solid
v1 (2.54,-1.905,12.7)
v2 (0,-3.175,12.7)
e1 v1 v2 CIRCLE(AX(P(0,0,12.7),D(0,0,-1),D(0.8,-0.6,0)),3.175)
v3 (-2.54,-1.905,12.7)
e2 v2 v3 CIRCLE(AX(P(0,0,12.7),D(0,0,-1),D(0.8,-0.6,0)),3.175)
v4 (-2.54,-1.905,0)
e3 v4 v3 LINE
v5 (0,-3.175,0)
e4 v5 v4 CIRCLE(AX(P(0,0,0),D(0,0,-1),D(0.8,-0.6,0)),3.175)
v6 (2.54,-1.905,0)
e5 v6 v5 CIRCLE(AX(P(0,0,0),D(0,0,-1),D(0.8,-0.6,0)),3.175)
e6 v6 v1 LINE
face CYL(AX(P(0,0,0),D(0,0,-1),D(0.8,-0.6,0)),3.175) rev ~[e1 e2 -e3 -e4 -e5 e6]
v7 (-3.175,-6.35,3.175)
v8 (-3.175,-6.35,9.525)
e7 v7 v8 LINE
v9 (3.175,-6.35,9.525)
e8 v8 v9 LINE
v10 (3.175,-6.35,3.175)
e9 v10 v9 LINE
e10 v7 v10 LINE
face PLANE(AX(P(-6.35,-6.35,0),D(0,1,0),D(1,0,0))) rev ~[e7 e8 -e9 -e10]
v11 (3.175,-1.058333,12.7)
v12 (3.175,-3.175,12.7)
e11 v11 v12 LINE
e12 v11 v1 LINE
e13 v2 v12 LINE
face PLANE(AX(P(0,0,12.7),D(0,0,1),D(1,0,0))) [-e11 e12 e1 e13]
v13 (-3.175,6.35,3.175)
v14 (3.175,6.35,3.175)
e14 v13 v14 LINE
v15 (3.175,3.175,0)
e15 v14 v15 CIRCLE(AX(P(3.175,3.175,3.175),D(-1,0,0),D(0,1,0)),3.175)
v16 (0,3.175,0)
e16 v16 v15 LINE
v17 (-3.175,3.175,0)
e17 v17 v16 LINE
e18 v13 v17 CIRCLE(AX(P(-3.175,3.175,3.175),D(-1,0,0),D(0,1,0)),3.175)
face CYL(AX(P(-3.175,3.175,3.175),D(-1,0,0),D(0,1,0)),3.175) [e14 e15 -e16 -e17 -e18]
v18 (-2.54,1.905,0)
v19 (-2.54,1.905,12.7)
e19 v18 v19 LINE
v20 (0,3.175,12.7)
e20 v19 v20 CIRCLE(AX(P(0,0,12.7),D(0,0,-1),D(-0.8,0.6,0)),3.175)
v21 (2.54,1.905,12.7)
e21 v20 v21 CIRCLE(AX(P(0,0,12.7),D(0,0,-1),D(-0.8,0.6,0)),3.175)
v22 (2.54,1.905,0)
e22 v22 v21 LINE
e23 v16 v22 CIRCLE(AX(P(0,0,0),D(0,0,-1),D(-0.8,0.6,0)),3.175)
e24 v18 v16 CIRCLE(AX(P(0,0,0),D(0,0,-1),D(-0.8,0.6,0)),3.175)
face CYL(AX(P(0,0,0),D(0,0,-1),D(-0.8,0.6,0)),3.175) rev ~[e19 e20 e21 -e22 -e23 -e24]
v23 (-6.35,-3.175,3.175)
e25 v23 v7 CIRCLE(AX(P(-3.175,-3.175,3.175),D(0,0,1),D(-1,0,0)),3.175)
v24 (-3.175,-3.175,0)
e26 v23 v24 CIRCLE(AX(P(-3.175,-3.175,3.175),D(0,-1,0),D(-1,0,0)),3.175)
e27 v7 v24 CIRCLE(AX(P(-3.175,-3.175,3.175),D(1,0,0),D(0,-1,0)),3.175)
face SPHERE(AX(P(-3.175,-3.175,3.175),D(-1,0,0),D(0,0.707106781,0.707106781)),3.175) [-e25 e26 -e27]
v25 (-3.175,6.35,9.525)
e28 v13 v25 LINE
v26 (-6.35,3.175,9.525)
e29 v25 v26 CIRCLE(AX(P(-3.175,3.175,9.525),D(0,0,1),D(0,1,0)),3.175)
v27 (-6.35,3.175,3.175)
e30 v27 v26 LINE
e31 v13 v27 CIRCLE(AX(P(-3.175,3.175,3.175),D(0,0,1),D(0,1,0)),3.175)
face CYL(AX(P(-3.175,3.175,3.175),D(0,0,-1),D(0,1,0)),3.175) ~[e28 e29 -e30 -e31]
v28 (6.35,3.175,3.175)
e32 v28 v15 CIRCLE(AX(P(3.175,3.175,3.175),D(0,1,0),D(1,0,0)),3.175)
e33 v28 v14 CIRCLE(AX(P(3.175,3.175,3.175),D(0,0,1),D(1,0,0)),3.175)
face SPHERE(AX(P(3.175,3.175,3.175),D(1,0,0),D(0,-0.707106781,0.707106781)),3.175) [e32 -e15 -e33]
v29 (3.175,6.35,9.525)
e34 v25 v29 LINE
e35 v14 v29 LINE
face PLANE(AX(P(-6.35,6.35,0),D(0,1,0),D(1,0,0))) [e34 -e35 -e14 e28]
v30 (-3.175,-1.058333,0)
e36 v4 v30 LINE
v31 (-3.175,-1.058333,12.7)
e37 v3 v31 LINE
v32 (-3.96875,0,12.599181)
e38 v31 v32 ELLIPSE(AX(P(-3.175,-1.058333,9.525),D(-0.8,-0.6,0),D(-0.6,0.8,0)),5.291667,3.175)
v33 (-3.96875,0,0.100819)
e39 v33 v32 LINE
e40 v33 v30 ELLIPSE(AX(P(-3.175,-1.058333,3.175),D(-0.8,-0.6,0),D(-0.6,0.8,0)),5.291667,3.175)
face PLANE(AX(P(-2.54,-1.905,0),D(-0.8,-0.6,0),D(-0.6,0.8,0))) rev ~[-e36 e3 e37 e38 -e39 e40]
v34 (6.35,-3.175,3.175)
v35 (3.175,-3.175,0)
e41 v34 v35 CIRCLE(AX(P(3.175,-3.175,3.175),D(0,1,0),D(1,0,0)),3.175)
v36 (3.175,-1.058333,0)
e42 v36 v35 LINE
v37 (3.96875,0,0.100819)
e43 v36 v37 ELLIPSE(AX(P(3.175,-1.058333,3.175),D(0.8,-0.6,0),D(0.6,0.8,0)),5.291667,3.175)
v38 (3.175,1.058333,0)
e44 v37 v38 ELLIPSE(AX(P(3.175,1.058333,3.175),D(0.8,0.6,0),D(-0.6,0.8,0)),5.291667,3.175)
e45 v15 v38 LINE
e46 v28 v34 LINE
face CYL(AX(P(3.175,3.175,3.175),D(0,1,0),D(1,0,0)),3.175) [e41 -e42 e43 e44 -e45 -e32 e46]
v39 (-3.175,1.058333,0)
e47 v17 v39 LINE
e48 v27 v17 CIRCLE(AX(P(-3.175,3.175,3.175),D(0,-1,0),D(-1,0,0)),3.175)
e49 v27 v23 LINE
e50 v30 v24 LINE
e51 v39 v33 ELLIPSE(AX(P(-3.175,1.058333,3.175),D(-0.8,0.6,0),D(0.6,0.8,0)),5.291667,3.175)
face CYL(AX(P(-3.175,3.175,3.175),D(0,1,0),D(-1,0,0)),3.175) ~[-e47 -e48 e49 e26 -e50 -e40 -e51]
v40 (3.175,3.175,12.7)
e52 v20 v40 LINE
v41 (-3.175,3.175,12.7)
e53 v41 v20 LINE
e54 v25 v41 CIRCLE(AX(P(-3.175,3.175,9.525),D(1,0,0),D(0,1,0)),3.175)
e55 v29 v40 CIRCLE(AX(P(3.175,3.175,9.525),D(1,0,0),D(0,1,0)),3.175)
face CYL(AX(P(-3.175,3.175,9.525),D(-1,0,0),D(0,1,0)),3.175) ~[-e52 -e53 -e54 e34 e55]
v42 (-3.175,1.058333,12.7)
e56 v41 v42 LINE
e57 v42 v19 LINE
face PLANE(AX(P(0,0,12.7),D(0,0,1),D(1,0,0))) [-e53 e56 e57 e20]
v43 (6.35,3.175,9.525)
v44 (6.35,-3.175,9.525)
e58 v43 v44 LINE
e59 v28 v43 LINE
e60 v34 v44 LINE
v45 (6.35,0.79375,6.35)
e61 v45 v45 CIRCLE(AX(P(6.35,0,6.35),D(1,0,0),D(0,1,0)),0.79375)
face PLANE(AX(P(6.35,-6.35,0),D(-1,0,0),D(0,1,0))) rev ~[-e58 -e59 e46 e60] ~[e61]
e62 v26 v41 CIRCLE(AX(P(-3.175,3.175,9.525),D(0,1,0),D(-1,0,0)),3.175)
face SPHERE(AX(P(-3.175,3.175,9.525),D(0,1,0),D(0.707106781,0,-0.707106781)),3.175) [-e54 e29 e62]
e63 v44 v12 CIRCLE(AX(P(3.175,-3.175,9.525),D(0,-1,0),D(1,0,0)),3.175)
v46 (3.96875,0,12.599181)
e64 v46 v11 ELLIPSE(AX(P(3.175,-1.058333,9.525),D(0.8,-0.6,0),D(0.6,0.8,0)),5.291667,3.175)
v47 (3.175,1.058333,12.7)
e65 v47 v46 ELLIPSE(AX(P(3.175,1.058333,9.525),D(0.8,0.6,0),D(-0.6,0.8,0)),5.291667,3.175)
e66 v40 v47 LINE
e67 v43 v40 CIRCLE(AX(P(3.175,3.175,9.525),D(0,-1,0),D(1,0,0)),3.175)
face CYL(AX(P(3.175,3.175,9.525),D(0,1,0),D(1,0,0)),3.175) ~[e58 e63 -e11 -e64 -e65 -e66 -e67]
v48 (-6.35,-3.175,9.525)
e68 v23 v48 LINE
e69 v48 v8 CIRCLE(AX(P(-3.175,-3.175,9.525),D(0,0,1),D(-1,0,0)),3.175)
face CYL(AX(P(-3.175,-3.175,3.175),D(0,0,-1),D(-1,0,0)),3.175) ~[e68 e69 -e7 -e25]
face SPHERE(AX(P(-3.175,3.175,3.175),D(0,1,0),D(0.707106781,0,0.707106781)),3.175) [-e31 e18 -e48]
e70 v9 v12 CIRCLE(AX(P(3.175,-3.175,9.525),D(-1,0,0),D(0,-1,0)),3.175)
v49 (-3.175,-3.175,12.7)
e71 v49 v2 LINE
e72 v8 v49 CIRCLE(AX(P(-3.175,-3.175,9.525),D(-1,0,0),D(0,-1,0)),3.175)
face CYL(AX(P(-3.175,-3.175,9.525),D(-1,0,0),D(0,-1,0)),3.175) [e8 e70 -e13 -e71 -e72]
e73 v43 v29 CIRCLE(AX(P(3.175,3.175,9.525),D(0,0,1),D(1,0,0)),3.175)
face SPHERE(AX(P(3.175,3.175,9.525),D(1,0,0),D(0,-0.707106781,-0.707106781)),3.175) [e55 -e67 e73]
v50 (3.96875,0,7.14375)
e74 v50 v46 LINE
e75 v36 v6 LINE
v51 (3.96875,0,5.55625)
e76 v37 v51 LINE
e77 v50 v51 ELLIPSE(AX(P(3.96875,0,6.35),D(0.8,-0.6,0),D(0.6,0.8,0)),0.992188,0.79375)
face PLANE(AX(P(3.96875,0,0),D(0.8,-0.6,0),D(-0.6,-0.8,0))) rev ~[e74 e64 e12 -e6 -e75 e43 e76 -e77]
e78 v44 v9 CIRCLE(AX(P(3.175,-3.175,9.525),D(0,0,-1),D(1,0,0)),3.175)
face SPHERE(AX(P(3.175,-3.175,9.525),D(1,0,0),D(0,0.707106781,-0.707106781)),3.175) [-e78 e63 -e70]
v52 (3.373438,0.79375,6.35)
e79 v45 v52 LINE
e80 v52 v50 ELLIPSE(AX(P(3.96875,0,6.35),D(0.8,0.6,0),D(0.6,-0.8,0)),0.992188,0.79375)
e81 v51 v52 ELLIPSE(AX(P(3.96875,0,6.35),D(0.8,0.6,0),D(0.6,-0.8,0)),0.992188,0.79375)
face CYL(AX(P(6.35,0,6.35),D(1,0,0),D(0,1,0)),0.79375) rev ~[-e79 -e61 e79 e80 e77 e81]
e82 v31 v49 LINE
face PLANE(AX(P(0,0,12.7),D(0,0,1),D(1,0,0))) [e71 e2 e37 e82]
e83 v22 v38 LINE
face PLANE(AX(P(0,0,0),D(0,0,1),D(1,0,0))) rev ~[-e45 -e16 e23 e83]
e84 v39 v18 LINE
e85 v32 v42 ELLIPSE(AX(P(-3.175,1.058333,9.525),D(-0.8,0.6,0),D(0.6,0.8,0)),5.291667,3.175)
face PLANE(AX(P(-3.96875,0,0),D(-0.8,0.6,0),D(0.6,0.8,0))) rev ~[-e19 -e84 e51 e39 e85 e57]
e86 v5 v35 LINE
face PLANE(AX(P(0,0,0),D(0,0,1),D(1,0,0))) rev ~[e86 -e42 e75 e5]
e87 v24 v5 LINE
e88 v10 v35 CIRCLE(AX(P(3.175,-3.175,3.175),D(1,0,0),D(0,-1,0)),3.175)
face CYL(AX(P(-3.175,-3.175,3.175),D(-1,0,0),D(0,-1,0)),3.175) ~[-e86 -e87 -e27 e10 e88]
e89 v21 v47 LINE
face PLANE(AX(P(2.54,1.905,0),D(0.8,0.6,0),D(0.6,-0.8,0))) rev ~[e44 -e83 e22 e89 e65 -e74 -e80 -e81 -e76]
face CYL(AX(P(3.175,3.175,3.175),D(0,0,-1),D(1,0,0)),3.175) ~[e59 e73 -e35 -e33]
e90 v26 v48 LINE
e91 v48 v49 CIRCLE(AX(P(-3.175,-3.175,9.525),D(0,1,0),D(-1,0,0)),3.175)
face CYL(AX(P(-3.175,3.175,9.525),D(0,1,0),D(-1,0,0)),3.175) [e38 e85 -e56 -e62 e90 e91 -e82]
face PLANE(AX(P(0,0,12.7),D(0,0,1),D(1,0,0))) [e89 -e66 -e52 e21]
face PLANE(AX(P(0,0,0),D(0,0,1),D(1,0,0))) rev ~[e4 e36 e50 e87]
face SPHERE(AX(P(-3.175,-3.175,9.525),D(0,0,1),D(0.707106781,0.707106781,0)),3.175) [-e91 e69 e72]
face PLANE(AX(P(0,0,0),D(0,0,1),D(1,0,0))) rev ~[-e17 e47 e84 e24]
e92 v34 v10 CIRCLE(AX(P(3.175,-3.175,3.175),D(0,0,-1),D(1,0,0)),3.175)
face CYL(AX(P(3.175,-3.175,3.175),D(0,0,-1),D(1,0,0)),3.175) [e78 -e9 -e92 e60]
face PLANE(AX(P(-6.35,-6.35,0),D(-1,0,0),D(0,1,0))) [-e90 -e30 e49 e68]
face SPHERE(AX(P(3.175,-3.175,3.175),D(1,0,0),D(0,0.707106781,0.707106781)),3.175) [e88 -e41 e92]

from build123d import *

# Parameters (mm, degrees)
F0_W         = 12.7
F0_H         = 12.7
F1_DEPTH     = 12.7
F2_T1_DEPTH  = 6.35
F2_T3_DEPTH  = 6.35
F2_T5_DEPTH  = 6.35
F2_S9_W      = 3.175
F2_S9_H      = 3.175
F2_T10_DEPTH = 3.175
F2_S15_W     = 3.175
F2_S15_H     = 3.175
F2_T16_DEPTH = 3.175
F2_S21_W     = 3.175
F2_S21_H     = 3.175
F2_T22_DEPTH = 3.175
F2_S27_W     = 3.175
F2_S27_H     = 3.175
F2_T28_DEPTH = 3.175
F2_S33_W     = 3.175
F2_S33_H     = 3.175
F2_T34_DEPTH = 3.175
F2_S39_W     = 3.175
F2_S39_H     = 3.175
F2_T40_DEPTH = 3.175
F2_S45_W     = 3.175
F2_S45_H     = 3.175
F2_T46_DEPTH = 3.175
F2_S51_W     = 3.175
F2_S51_H     = 3.175
F2_T52_DEPTH = 3.175
F3_R         = 0.79375
F4_DEPTH     = 6.2992


# Not quite as in the source:
# - a fillet or chamfer that OpenCascade refuses, or shapes differently, is made with other operations: its cross-section is extruded or revolved along the edge and cut away or added


with BuildPart() as f1:
    # F0 (on Top) → F1 (new body)
    with BuildSketch(Plane.XY):
        Rectangle(F0_W, F0_H)
        with BuildLine():
            ThreePointArc((-2.54, 1.905), (0, 3.175), (2.54, 1.905))
            Line((2.54, 1.905), (3.96875, 0))
            Line((3.96875, 0), (2.54, -1.905))
            ThreePointArc((2.54, -1.905), (0, -3.175), (-2.54, -1.905))
            Line((-2.54, -1.905), (-3.96875, 0))
            Line((-3.96875, 0), (-2.54, 1.905))
        make_face(mode=Mode.SUBTRACT)
    extrude(amount=F1_DEPTH)

    # F2: fillet of radius 3.175 on 12 edges, made by hand

    # F2_s2 → F2_t1 (cut)
    with BuildSketch(Plane.XY.offset(3.175)):
        with BuildLine():
            ThreePointArc((6.35, -3.175), (5.4200640303, -5.4200640303), (3.175, -6.35))
            Line((3.175, -6.35), (6.35, -6.35))
            Line((6.35, -6.35), (6.35, -3.175))
        make_face()
        with BuildLine():
            ThreePointArc((6.35, 3.175), (5.4200640303, 5.4200640303), (3.175, 6.35))
            Line((3.175, 6.35), (6.35, 6.35))
            Line((6.35, 6.35), (6.35, 3.175))
        make_face()
        with BuildLine():
            ThreePointArc((-3.175, 6.35), (-5.4200640303, 5.4200640303), (-6.35, 3.175))
            Line((-6.35, 3.175), (-6.35, 6.35))
            Line((-6.35, 6.35), (-3.175, 6.35))
        make_face()
        with BuildLine():
            ThreePointArc((-6.35, -3.175), (-5.4200640303, -5.4200640303), (-3.175, -6.35))
            Line((-3.175, -6.35), (-6.35, -6.35))
            Line((-6.35, -6.35), (-6.35, -3.175))
        make_face()
    extrude(amount=F2_T1_DEPTH, mode=Mode.SUBTRACT)

    # F2_s4 → F2_t3 (cut)
    with BuildSketch(Plane.YZ.offset(-3.175)):
        with BuildLine():
            ThreePointArc((-6.35, 9.525), (-5.4200640303, 11.7700640303), (-3.175, 12.7))
            Line((-3.175, 12.7), (-6.35, 12.7))
            Line((-6.35, 12.7), (-6.35, 9.525))
        make_face()
        with BuildLine():
            ThreePointArc((-6.35, 3.175), (-5.4200640303, 0.9299359697), (-3.175, 0))
            Line((-3.175, 0), (-6.35, 0))
            Line((-6.35, 0), (-6.35, 3.175))
        make_face()
        with BuildLine():
            ThreePointArc((6.35, 3.175), (5.4200640303, 0.9299359697), (3.175, 0))
            Line((3.175, 0), (6.35, 0))
            Line((6.35, 0), (6.35, 3.175))
        make_face()
        with BuildLine():
            ThreePointArc((6.35, 9.525), (5.4200640303, 11.7700640303), (3.175, 12.7))
            Line((3.175, 12.7), (6.35, 12.7))
            Line((6.35, 12.7), (6.35, 9.525))
        make_face()
    extrude(amount=F2_T3_DEPTH, mode=Mode.SUBTRACT)

    # F2_s6 → F2_t5 (cut)
    with BuildSketch(Plane.XZ.offset(-3.175)):
        with BuildLine():
            ThreePointArc((6.35, 9.525), (5.4200640303, 11.7700640303), (3.175, 12.7))
            Line((3.175, 12.7), (6.35, 12.7))
            Line((6.35, 12.7), (6.35, 9.525))
        make_face()
        with BuildLine():
            ThreePointArc((6.35, 3.175), (5.4200640303, 0.9299359697), (3.175, 0))
            Line((3.175, 0), (6.35, 0))
            Line((6.35, 0), (6.35, 3.175))
        make_face()
        with BuildLine():
            ThreePointArc((-6.35, 3.175), (-5.4200640303, 0.9299359697), (-3.175, 0))
            Line((-3.175, 0), (-6.35, 0))
            Line((-6.35, 0), (-6.35, 3.175))
        make_face()
        with BuildLine():
            ThreePointArc((-6.35, 9.525), (-5.4200640303, 11.7700640303), (-3.175, 12.7))
            Line((-3.175, 12.7), (-6.35, 12.7))
            Line((-6.35, 12.7), (-6.35, 9.525))
        make_face()
    extrude(amount=F2_T5_DEPTH, mode=Mode.SUBTRACT)


with BuildPart() as f2_tool8:
    # F2_s9 → F2_t10 (new body)
    with BuildSketch(Plane.YZ.offset(3.175)):
        with Locations((-4.7625, 1.5875)):
            Rectangle(F2_S9_W, F2_S9_H)
    extrude(amount=F2_T10_DEPTH)

    # F2_s11 → F2_t12 (revolve, cut)
    with BuildSketch(Plane(origin=(3.175, -3.175, 3.175), x_dir=(0, 0.7071067812, 0.7071067812), z_dir=(0, 0.7071067812, -0.7071067812))):
        with BuildLine():
            ThreePointArc((0, -3.175), (3.175, 0), (0, 3.175))
            Line((0, 3.175), (0, -3.175))
        make_face()
    revolve(axis=Axis((3.175, -3.175, 3.175), (1, 0, 0)), mode=Mode.SUBTRACT)


with BuildPart() as f1_1:
    add(f1.part)

    # F2_t7: cut F2_tool8
    add(f2_tool8.part, mode=Mode.SUBTRACT)


with BuildPart() as f2_tool14:
    # F2_s15 → F2_t16 (new body)
    with BuildSketch(Plane.YZ.offset(3.175)):
        with Locations((-4.7625, 11.1125)):
            Rectangle(F2_S15_W, F2_S15_H)
    extrude(amount=F2_T16_DEPTH)

    # F2_s17 → F2_t18 (revolve, cut)
    with BuildSketch(Plane(origin=(3.175, -3.175, 9.525), x_dir=(0, 0.7071067812, -0.7071067812), z_dir=(0, -0.7071067812, -0.7071067812))):
        with BuildLine():
            ThreePointArc((0, -3.175), (3.175, 0), (0, 3.175))
            Line((0, 3.175), (0, -3.175))
        make_face()
    revolve(axis=Axis((3.175, -3.175, 9.525), (1, 0, 0)), mode=Mode.SUBTRACT)


with BuildPart() as f1_2:
    add(f1_1.part)

    # F2_t13: cut F2_tool14
    add(f2_tool14.part, mode=Mode.SUBTRACT)


with BuildPart() as f2_tool20:
    # F2_s21 → F2_t22 (new body)
    with BuildSketch(Plane.XY.offset(9.525)):
        with Locations((-4.7625, -4.7625)):
            Rectangle(F2_S21_W, F2_S21_H)
    extrude(amount=F2_T22_DEPTH)

    # F2_s23 → F2_t24 (revolve, cut)
    with BuildSketch(Plane(origin=(-3.175, -3.175, 9.525), x_dir=(0.7071067812, 0.7071067812, 0), z_dir=(0.7071067812, -0.7071067812, 0))):
        with BuildLine():
            ThreePointArc((0, -3.175), (3.175, 0), (0, 3.175))
            Line((0, 3.175), (0, -3.175))
        make_face()
    revolve(axis=Axis((-3.175, -3.175, 9.525), (0, 0, 1)), mode=Mode.SUBTRACT)


with BuildPart() as f1_3:
    add(f1_2.part)

    # F2_t19: cut F2_tool20
    add(f2_tool20.part, mode=Mode.SUBTRACT)


with BuildPart() as f2_tool26:
    # F2_s27 → F2_t28 (new body)
    with BuildSketch(Plane.YZ.offset(3.175)):
        with Locations((4.7625, 11.1125)):
            Rectangle(F2_S27_W, F2_S27_H)
    extrude(amount=F2_T28_DEPTH)

    # F2_s29 → F2_t30 (revolve, cut)
    with BuildSketch(Plane(origin=(3.175, 3.175, 9.525), x_dir=(0, -0.7071067812, -0.7071067812), z_dir=(0, -0.7071067812, 0.7071067812))):
        with BuildLine():
            ThreePointArc((0, -3.175), (3.175, 0), (0, 3.175))
            Line((0, 3.175), (0, -3.175))
        make_face()
    revolve(axis=Axis((3.175, 3.175, 9.525), (1, 0, 0)), mode=Mode.SUBTRACT)


with BuildPart() as f1_4:
    add(f1_3.part)

    # F2_t25: cut F2_tool26
    add(f2_tool26.part, mode=Mode.SUBTRACT)


with BuildPart() as f2_tool32:
    # F2_s33 → F2_t34 (new body)
    with BuildSketch(Plane.YZ.offset(3.175)):
        with Locations((4.7625, 1.5875)):
            Rectangle(F2_S33_W, F2_S33_H)
    extrude(amount=F2_T34_DEPTH)

    # F2_s35 → F2_t36 (revolve, cut)
    with BuildSketch(Plane(origin=(3.175, 3.175, 3.175), x_dir=(0, -0.7071067812, 0.7071067812), z_dir=(0, 0.7071067812, 0.7071067812))):
        with BuildLine():
            ThreePointArc((0, -3.175), (3.175, 0), (0, 3.175))
            Line((0, 3.175), (0, -3.175))
        make_face()
    revolve(axis=Axis((3.175, 3.175, 3.175), (1, 0, 0)), mode=Mode.SUBTRACT)


with BuildPart() as f1_5:
    add(f1_4.part)

    # F2_t31: cut F2_tool32
    add(f2_tool32.part, mode=Mode.SUBTRACT)


with BuildPart() as f2_tool38:
    # F2_s39 → F2_t40 (new body)
    with BuildSketch(Plane.YZ.offset(-3.175)):
        with Locations((-4.7625, 1.5875)):
            Rectangle(F2_S39_W, F2_S39_H)
    extrude(amount=-F2_T40_DEPTH)

    # F2_s41 → F2_t42 (revolve, cut)
    with BuildSketch(Plane(origin=(-3.175, -3.175, 3.175), x_dir=(0, 0.7071067812, 0.7071067812), z_dir=(0, -0.7071067812, 0.7071067812))):
        with BuildLine():
            ThreePointArc((0, -3.175), (3.175, 0), (0, 3.175))
            Line((0, 3.175), (0, -3.175))
        make_face()
    revolve(axis=Axis((-3.175, -3.175, 3.175), (-1, 0, 0)), mode=Mode.SUBTRACT)


with BuildPart() as f1_6:
    add(f1_5.part)

    # F2_t37: cut F2_tool38
    add(f2_tool38.part, mode=Mode.SUBTRACT)


with BuildPart() as f2_tool44:
    # F2_s45 → F2_t46 (new body)
    with BuildSketch(Plane.XZ.offset(-3.175)):
        with Locations((-4.7625, 1.5875)):
            Rectangle(F2_S45_W, F2_S45_H)
    extrude(amount=-F2_T46_DEPTH)

    # F2_s47 → F2_t48 (revolve, cut)
    with BuildSketch(Plane(origin=(-3.175, 3.175, 3.175), x_dir=(0.7071067812, 0, 0.7071067812), z_dir=(-0.7071067812, 0, 0.7071067812))):
        with BuildLine():
            ThreePointArc((0, -3.175), (3.175, 0), (0, 3.175))
            Line((0, 3.175), (0, -3.175))
        make_face()
    revolve(axis=Axis((-3.175, 3.175, 3.175), (0, 1, 0)), mode=Mode.SUBTRACT)


with BuildPart() as f1_7:
    add(f1_6.part)

    # F2_t43: cut F2_tool44
    add(f2_tool44.part, mode=Mode.SUBTRACT)


with BuildPart() as f2_tool50:
    # F2_s51 → F2_t52 (new body)
    with BuildSketch(Plane.XZ.offset(-3.175)):
        with Locations((-4.7625, 11.1125)):
            Rectangle(F2_S51_W, F2_S51_H)
    extrude(amount=-F2_T52_DEPTH)

    # F2_s53 → F2_t54 (revolve, cut)
    with BuildSketch(Plane(origin=(-3.175, 3.175, 9.525), x_dir=(0.7071067812, 0, -0.7071067812), z_dir=(0.7071067812, 0, 0.7071067812))):
        with BuildLine():
            ThreePointArc((0, -3.175), (3.175, 0), (0, 3.175))
            Line((0, 3.175), (0, -3.175))
        make_face()
    revolve(axis=Axis((-3.175, 3.175, 9.525), (0, 1, 0)), mode=Mode.SUBTRACT)


with BuildPart() as f1_8:
    add(f1_7.part)

    # F2_t49: cut F2_tool50
    add(f2_tool50.part, mode=Mode.SUBTRACT)

    # F3 (on face) → F4 (cut)
    with BuildSketch(Plane.YZ.offset(6.35)):
        with Locations((0, 6.35)):
            Circle(F3_R)
    extrude(amount=-F4_DEPTH, mode=Mode.SUBTRACT)


solid = f1_8.part
